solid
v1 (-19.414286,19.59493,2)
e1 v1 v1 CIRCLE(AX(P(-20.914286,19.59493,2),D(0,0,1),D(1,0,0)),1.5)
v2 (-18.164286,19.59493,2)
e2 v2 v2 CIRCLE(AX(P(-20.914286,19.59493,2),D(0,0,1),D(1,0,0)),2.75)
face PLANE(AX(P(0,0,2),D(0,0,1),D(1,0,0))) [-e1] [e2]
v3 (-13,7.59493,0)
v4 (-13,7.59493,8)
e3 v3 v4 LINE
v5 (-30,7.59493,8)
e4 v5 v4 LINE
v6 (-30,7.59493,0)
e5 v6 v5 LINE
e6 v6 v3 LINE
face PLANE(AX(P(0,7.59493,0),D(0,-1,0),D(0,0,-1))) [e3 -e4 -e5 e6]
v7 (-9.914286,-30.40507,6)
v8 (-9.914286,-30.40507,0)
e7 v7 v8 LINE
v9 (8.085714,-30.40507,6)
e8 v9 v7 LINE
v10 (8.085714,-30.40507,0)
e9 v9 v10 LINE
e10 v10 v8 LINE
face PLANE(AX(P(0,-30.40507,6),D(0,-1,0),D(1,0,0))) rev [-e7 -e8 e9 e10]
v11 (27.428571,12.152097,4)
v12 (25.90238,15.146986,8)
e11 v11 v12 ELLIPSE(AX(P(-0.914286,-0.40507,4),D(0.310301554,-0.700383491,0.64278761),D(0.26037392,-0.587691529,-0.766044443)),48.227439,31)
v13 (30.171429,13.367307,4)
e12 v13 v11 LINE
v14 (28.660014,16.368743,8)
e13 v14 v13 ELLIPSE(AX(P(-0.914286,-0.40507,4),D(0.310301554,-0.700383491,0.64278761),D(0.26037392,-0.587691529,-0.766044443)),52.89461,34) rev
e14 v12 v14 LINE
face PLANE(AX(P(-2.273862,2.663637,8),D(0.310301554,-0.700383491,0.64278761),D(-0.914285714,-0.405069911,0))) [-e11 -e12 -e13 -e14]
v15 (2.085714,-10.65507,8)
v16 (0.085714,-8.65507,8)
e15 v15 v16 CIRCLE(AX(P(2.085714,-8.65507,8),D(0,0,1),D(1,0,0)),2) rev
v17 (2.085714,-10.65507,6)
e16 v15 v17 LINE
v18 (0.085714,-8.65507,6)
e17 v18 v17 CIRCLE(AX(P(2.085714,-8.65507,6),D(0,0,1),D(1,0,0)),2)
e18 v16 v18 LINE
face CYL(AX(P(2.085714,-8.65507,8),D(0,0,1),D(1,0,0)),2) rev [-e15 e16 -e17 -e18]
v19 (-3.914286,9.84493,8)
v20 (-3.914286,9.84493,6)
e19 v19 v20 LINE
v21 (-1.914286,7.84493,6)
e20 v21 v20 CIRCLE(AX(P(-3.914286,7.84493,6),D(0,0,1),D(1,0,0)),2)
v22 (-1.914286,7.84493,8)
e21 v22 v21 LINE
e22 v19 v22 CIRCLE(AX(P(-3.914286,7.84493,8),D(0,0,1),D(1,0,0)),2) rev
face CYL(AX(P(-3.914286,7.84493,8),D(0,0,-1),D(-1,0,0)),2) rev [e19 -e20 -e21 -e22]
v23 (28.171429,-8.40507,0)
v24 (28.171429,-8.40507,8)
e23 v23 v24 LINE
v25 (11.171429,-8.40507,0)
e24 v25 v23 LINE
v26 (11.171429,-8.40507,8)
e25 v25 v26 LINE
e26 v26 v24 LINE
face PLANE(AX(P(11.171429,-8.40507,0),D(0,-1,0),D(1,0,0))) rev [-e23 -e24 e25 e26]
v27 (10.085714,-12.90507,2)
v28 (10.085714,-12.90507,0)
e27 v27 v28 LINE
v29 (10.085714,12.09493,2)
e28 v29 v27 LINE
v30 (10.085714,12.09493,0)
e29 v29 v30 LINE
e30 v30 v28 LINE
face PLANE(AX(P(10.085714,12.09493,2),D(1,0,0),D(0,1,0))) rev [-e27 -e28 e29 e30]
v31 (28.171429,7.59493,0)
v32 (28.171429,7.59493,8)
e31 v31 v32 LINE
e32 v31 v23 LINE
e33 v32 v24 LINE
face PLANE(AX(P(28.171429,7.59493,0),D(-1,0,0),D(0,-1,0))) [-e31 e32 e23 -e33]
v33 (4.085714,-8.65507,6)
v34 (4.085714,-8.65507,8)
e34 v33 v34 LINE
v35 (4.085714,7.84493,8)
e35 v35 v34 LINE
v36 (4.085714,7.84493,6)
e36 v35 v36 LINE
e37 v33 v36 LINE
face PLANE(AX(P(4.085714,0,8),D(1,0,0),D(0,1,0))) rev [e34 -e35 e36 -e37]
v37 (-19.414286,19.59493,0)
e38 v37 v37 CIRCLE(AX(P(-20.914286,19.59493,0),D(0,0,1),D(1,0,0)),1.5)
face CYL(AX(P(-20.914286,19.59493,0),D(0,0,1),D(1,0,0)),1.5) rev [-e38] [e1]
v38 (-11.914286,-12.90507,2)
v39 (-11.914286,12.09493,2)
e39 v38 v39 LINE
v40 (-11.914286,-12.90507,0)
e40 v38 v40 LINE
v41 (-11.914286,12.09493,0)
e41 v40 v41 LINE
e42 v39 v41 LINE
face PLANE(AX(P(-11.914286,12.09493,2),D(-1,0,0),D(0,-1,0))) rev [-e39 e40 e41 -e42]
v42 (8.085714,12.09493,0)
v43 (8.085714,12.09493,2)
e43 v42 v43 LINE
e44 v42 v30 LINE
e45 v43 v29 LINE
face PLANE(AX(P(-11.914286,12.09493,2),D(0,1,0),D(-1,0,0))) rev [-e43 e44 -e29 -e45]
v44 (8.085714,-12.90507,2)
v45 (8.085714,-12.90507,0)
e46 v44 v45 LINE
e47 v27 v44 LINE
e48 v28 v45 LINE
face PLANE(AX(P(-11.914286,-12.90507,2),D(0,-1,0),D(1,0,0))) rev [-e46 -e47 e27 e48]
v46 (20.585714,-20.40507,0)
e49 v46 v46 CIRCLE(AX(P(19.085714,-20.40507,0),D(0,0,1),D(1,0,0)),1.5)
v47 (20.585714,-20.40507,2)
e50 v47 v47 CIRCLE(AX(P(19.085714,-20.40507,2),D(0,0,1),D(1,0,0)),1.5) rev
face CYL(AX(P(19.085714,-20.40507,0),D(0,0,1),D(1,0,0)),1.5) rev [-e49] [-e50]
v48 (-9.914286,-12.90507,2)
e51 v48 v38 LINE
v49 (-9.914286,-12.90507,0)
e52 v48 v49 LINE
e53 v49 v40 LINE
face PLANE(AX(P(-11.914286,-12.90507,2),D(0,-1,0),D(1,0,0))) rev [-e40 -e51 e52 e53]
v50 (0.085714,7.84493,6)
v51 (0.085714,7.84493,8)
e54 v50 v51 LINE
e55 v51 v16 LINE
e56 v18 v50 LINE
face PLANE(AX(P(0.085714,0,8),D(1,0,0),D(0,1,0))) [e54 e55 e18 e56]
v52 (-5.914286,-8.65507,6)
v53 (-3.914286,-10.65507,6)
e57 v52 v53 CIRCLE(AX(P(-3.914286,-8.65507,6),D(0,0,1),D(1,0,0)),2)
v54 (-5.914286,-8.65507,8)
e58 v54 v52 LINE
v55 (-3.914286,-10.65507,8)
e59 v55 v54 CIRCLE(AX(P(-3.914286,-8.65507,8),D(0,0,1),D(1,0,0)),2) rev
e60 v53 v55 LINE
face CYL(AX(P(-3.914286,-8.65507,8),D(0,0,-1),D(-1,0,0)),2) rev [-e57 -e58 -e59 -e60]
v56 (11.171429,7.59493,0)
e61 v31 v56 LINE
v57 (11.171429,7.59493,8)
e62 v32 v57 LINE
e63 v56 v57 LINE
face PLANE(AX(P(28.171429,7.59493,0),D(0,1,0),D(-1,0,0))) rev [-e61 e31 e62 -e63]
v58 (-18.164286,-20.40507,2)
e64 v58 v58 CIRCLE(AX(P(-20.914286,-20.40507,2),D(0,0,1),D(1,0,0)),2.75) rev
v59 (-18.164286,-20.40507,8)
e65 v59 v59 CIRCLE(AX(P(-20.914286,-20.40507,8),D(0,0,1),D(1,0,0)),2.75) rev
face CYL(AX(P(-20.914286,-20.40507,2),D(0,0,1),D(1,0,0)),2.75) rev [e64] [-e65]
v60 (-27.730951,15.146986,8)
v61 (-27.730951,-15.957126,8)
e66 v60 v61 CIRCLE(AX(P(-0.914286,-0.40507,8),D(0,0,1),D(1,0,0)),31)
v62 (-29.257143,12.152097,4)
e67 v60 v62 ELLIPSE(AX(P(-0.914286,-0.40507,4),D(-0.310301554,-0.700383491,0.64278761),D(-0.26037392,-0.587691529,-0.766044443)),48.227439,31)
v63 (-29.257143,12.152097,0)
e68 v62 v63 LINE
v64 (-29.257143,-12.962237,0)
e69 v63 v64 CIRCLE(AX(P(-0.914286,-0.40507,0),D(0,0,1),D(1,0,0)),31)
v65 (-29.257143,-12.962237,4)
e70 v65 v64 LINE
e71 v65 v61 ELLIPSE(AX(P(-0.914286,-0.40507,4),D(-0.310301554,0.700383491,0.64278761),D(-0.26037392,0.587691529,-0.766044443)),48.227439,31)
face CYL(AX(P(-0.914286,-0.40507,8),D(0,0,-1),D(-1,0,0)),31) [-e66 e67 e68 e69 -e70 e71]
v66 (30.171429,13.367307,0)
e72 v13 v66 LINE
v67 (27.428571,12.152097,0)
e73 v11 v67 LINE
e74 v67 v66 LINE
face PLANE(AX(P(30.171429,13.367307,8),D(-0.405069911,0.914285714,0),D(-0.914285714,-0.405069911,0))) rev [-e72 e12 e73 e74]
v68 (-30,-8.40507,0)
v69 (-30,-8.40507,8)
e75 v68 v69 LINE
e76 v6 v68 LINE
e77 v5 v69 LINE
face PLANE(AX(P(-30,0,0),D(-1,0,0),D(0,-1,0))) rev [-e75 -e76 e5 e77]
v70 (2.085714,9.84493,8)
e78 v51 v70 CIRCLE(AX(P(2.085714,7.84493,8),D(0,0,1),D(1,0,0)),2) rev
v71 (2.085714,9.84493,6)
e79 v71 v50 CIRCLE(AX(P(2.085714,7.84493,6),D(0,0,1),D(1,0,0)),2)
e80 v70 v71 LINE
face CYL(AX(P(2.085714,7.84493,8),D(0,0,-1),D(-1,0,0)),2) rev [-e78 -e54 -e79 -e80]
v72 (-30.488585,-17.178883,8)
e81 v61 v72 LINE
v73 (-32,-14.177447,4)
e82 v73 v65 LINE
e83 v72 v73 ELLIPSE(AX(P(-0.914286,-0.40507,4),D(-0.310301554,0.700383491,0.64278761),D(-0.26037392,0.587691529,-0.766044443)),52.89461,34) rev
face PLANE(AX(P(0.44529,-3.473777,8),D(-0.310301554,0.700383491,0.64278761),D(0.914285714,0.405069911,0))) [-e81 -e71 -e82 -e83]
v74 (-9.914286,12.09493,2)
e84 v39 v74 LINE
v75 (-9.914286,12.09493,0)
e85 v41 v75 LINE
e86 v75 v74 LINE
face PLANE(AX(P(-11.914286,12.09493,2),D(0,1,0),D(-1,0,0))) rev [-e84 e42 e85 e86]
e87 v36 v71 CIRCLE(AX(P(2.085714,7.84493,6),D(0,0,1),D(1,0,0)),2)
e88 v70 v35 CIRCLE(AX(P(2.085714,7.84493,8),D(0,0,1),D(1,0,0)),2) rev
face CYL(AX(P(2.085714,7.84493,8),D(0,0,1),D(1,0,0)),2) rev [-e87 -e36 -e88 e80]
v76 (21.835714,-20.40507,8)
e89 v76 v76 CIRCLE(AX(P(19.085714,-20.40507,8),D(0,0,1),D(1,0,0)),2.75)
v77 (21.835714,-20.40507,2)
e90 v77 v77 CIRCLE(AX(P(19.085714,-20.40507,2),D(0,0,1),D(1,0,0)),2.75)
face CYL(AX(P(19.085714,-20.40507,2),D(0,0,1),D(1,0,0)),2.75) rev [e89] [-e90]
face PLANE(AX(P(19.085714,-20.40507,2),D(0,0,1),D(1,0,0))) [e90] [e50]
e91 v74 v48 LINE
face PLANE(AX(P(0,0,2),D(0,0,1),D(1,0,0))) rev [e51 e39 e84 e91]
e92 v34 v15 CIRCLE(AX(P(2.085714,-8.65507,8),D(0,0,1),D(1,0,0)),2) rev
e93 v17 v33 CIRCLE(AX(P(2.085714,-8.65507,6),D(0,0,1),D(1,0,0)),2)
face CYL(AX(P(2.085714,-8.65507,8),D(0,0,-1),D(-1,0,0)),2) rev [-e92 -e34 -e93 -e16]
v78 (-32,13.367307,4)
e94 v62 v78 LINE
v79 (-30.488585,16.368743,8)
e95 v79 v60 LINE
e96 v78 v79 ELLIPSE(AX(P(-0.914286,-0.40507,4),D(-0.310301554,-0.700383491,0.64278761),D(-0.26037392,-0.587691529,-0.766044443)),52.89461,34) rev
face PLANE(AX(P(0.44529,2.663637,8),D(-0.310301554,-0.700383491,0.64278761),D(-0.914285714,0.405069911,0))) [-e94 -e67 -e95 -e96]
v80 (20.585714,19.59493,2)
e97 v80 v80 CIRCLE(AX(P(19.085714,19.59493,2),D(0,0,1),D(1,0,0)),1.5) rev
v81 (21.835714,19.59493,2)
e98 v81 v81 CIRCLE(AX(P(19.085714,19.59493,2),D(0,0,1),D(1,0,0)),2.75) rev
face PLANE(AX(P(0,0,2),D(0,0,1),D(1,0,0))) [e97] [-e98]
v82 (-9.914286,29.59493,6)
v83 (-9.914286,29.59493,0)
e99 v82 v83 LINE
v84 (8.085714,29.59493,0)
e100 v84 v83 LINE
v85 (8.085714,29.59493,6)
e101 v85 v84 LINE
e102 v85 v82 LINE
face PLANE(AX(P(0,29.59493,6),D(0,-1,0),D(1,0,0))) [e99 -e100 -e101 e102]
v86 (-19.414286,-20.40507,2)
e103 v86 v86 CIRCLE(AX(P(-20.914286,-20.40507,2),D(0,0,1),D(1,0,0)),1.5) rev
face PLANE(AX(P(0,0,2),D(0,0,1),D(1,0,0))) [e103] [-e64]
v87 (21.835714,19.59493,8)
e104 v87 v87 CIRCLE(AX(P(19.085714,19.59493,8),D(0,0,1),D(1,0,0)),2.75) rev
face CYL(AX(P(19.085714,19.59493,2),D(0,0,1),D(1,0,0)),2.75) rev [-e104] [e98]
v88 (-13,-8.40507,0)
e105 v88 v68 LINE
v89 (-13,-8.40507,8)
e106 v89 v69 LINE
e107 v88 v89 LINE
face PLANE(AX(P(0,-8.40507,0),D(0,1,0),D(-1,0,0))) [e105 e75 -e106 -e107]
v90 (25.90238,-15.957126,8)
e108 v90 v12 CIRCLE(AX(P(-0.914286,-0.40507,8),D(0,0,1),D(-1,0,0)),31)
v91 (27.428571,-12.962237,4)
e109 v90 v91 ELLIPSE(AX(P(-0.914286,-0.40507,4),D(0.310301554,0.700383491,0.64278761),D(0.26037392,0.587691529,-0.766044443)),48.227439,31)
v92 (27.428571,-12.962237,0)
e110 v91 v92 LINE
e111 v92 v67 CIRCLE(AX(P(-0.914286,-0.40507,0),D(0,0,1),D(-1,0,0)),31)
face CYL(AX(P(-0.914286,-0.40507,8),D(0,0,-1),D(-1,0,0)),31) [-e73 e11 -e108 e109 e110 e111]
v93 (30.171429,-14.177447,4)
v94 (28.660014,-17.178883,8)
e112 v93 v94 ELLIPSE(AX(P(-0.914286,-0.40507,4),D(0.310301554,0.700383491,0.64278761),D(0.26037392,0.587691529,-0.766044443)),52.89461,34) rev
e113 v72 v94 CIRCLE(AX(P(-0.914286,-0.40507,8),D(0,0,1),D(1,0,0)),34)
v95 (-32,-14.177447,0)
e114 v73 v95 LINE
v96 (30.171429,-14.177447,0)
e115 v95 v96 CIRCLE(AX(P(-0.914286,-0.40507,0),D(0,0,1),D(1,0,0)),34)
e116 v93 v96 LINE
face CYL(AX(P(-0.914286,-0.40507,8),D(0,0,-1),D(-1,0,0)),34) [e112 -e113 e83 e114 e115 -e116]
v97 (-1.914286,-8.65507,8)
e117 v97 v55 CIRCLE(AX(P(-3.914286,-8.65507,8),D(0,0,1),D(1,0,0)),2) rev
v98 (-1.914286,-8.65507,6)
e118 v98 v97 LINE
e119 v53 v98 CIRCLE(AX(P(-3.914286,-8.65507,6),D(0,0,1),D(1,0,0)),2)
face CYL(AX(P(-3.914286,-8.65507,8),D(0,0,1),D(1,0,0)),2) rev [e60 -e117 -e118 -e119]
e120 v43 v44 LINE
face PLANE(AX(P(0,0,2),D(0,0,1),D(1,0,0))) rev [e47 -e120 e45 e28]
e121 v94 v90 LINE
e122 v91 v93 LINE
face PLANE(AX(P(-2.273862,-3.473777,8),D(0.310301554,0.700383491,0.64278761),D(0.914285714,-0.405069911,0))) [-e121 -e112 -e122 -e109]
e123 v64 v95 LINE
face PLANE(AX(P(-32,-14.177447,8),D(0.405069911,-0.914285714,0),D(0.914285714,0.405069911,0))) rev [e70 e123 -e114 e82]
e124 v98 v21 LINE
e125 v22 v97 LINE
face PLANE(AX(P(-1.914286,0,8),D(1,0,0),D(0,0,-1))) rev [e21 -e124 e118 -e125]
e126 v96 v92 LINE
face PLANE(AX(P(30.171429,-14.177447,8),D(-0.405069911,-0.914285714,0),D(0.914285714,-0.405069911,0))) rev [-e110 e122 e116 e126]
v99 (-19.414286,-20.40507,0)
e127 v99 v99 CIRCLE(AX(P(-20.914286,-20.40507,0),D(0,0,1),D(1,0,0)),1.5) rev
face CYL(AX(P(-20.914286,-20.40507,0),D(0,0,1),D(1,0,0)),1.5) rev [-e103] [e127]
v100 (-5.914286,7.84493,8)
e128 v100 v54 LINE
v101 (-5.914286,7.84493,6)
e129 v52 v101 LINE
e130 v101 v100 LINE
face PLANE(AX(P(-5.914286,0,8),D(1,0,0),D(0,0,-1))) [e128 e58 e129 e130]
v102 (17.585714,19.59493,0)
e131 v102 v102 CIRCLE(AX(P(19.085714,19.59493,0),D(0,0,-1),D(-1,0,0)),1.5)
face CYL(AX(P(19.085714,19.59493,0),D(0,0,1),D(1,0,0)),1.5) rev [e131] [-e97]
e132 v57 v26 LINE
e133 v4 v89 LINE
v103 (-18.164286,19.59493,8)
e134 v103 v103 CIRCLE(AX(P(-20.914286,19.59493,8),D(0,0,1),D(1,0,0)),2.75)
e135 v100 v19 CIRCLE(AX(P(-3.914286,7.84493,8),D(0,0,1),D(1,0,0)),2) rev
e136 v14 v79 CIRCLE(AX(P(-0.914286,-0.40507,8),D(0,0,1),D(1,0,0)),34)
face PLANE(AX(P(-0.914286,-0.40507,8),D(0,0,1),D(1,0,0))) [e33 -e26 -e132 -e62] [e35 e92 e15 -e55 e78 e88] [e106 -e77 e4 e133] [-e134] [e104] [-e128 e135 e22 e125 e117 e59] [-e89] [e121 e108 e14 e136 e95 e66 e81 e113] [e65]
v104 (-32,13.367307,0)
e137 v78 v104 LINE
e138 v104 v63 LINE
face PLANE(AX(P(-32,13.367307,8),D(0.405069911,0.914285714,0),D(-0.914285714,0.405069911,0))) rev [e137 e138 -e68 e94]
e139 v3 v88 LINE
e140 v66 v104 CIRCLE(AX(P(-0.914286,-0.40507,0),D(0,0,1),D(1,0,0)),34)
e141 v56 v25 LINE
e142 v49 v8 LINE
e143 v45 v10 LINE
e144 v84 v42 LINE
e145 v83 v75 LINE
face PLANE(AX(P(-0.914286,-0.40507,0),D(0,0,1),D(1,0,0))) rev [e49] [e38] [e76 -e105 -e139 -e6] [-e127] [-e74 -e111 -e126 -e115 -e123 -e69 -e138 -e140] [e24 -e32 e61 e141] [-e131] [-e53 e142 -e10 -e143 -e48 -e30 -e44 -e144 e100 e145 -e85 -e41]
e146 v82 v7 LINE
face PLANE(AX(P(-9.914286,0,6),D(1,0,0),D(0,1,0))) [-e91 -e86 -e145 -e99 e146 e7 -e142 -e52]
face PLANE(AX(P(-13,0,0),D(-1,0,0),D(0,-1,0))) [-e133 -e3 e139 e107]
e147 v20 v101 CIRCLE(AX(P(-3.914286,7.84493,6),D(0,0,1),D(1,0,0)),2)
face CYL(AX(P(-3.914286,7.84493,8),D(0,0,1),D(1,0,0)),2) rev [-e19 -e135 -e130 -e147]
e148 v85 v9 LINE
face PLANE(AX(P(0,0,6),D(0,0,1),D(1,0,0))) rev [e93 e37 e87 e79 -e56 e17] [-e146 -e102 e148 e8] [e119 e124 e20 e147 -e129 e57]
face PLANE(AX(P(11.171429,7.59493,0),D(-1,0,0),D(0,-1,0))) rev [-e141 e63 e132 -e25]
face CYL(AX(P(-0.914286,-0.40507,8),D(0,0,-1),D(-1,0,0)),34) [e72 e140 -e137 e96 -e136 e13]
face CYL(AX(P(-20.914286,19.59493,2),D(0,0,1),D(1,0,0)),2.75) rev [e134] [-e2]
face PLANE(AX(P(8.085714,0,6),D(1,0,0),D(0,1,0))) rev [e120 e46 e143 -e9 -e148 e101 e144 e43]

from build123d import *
from OCP.BRepFilletAPI import BRepFilletAPI_MakeChamfer

# Parameters (mm, degrees)
BOSS_EXTRUDE1_DEPTH = 8
SKETCH3_W           = 17
SKETCH3_H           = 16
CUT_EXTRUDE1_DEPTH  = 8
SKETCH3_5_R         = 1.5
CUT_EXTRUDE3_DEPTH  = 8
SKETCH3_6_R         = 2.75
CUT_EXTRUDE4_DEPTH  = 6
CHAMFER1_SIZE       = 4
CHAMFER1_SIZE2      = 3.356398525
SKETCH4_W           = 18
SKETCH4_H           = 60
CUT_EXTRUDE6_DEPTH  = 6
SKETCH5_W           = 4
SKETCH5_H           = 20.5
CUT_EXTRUDE8_DEPTH  = 8
FILLET1_R           = 2
SKETCH6_W           = 22
SKETCH6_H           = 25
CUT_EXTRUDE10_DEPTH = 2


with BuildPart() as part:
    # Sketch1 → Boss-Extrude1 (new body)
    with BuildSketch(Plane.XY):
        with BuildLine():
            Line((-32, 13.367307057), (-29.257142857, 12.152097325))
            ThreePointArc((-29.257142857, 12.152097325), (-31.914285714, -0.405069911), (-29.257142857, -12.962237146))
            Line((-29.257142857, -12.962237146), (-32, -14.177446879))
            ThreePointArc((-32, -14.177446879), (-0.914285714, -34.405069911), (30.171428571, -14.177446879))
            Line((30.171428571, -14.177446879), (27.428571429, -12.962237146))
            ThreePointArc((27.428571429, -12.962237146), (30.085714286, -0.405069911), (27.428571429, 12.152097325))
            Line((27.428571429, 12.152097325), (30.171428571, 13.367307057))
            ThreePointArc((30.171428571, 13.367307057), (-0.914285714, 33.594930089), (-32, 13.367307057))
        make_face()
    extrude(amount=BOSS_EXTRUDE1_DEPTH)

    # Sketch3 → Cut-Extrude1 (cut)
    with BuildSketch(Plane.XY.offset(8)):
        with Locations((-21.5, -0.405069911)):
            Rectangle(SKETCH3_W, SKETCH3_H)
        with Locations((19.671428571, -0.405069911)):
            Rectangle(SKETCH3_W, SKETCH3_H)
    extrude(amount=-CUT_EXTRUDE1_DEPTH, mode=Mode.SUBTRACT)

    # Sketch3<5> → Cut-Extrude3 (cut)
    with BuildSketch(Plane.XY.offset(8)):
        with Locations(Location((19.085714286, 19.594930089, 0), (0, 0, 180))):
            Circle(SKETCH3_5_R)
        with Locations((-20.914285714, 19.594930089)):
            Circle(SKETCH3_5_R)
        with Locations((19.085714286, -20.405069911)):
            Circle(SKETCH3_5_R)
        with Locations((-20.914285714, -20.405069911)):
            Circle(SKETCH3_5_R)
    extrude(amount=-CUT_EXTRUDE3_DEPTH, mode=Mode.SUBTRACT)

    # Sketch3<6> → Cut-Extrude4 (cut)
    with BuildSketch(Plane.XY.offset(8)):
        with Locations((19.085714286, 19.594930089)):
            Circle(SKETCH3_6_R)
        with Locations((19.085714286, -20.405069911)):
            Circle(SKETCH3_6_R)
        with Locations((-20.914285714, 19.594930089)):
            Circle(SKETCH3_6_R)
        with Locations((-20.914285714, -20.405069911)):
            Circle(SKETCH3_6_R)
    extrude(amount=-CUT_EXTRUDE4_DEPTH, mode=Mode.SUBTRACT)

    # Chamfer1: one chamfer whose edges measure the first distance from different faces: ONE call of the kernel's chamfer builder (chamfer() names one face for all edges)
    chamfer1_edges_1 = [part.edges().sort_by_distance(p)[0] for p in [
        (28.8, 12.759702191, 8),
    ]]
    chamfer1_side_1 = [part.faces().sort_by_distance(p)[0] for p in [
        (28.8, 12.759702191, 4),
    ]]
    chamfer1_edges_2 = [part.edges().sort_by_distance(p)[0] for p in [
        (-30.628571429, 12.759702191, 8),
    ]]
    chamfer1_side_2 = [part.faces().sort_by_distance(p)[0] for p in [
        (-30.628571429, 12.759702191, 4),
    ]]
    chamfer1_edges_3 = [part.edges().sort_by_distance(p)[0] for p in [
        (-30.628571429, -13.569842013, 8),
    ]]
    chamfer1_side_3 = [part.faces().sort_by_distance(p)[0] for p in [
        (-30.628571429, -13.569842013, 4),
    ]]
    chamfer1_edges_4 = [part.edges().sort_by_distance(p)[0] for p in [
        (28.8, -13.569842013, 8),
    ]]
    chamfer1_side_4 = [part.faces().sort_by_distance(p)[0] for p in [
        (28.8, -13.569842013, 4),
    ]]
    chamfer1 = BRepFilletAPI_MakeChamfer(part.part.solid().wrapped)
    for e in chamfer1_edges_1:
        chamfer1.Add(CHAMFER1_SIZE, CHAMFER1_SIZE2, e.wrapped, chamfer1_side_1[0].wrapped)  # the first distance lies on this face
    for e in chamfer1_edges_2:
        chamfer1.Add(CHAMFER1_SIZE, CHAMFER1_SIZE2, e.wrapped, chamfer1_side_2[0].wrapped)  # the first distance lies on this face
    for e in chamfer1_edges_3:
        chamfer1.Add(CHAMFER1_SIZE, CHAMFER1_SIZE2, e.wrapped, chamfer1_side_3[0].wrapped)  # the first distance lies on this face
    for e in chamfer1_edges_4:
        chamfer1.Add(CHAMFER1_SIZE, CHAMFER1_SIZE2, e.wrapped, chamfer1_side_4[0].wrapped)  # the first distance lies on this face
    add(Compound.cast(chamfer1.Shape()), mode=Mode.REPLACE)

    # Sketch4 → Cut-Extrude6 (cut)
    with BuildSketch(Plane.XY):
        with Locations((-0.914285714, -0.405069911)):
            Rectangle(SKETCH4_W, SKETCH4_H)
    extrude(amount=CUT_EXTRUDE6_DEPTH, mode=Mode.SUBTRACT)

    # Sketch5 → Cut-Extrude8 (cut)
    with BuildSketch(Plane.XY):
        with Locations((2.085714286, -0.405069911)):
            Rectangle(SKETCH5_W, SKETCH5_H)
        with Locations((-3.914285714, -0.405069911)):
            Rectangle(SKETCH5_W, SKETCH5_H)
    extrude(amount=CUT_EXTRUDE8_DEPTH, mode=Mode.SUBTRACT)

    # Fillet1
    fillet1_edges = [part.edges().sort_by_distance(p)[0] for p in [
        (0.085714286, -10.655069911, 7),
        (4.085714286, -10.655069911, 7),
        (4.085714286, 9.844930089, 7),
        (0.085714286, 9.844930089, 7),
        (-1.914285714, -10.655069911, 7),
        (-5.914285714, -10.655069911, 7),
        (-1.914285714, 9.844930089, 7),
        (-5.914285714, 9.844930089, 7),
    ]]
    fillet(fillet1_edges, radius=FILLET1_R - 0.0001)  # a hair under: the kernel refuses the full size

    # Sketch6 → Cut-Extrude10 (cut)
    with BuildSketch(Plane(origin=(0, 0, 0), x_dir=(-1, 0, 0), z_dir=(0, 0, -1))):
        with Locations((0.914285714, -0.405069911)):
            Rectangle(SKETCH6_W, SKETCH6_H)
    extrude(amount=-CUT_EXTRUDE10_DEPTH, mode=Mode.SUBTRACT)


solid = part.part
